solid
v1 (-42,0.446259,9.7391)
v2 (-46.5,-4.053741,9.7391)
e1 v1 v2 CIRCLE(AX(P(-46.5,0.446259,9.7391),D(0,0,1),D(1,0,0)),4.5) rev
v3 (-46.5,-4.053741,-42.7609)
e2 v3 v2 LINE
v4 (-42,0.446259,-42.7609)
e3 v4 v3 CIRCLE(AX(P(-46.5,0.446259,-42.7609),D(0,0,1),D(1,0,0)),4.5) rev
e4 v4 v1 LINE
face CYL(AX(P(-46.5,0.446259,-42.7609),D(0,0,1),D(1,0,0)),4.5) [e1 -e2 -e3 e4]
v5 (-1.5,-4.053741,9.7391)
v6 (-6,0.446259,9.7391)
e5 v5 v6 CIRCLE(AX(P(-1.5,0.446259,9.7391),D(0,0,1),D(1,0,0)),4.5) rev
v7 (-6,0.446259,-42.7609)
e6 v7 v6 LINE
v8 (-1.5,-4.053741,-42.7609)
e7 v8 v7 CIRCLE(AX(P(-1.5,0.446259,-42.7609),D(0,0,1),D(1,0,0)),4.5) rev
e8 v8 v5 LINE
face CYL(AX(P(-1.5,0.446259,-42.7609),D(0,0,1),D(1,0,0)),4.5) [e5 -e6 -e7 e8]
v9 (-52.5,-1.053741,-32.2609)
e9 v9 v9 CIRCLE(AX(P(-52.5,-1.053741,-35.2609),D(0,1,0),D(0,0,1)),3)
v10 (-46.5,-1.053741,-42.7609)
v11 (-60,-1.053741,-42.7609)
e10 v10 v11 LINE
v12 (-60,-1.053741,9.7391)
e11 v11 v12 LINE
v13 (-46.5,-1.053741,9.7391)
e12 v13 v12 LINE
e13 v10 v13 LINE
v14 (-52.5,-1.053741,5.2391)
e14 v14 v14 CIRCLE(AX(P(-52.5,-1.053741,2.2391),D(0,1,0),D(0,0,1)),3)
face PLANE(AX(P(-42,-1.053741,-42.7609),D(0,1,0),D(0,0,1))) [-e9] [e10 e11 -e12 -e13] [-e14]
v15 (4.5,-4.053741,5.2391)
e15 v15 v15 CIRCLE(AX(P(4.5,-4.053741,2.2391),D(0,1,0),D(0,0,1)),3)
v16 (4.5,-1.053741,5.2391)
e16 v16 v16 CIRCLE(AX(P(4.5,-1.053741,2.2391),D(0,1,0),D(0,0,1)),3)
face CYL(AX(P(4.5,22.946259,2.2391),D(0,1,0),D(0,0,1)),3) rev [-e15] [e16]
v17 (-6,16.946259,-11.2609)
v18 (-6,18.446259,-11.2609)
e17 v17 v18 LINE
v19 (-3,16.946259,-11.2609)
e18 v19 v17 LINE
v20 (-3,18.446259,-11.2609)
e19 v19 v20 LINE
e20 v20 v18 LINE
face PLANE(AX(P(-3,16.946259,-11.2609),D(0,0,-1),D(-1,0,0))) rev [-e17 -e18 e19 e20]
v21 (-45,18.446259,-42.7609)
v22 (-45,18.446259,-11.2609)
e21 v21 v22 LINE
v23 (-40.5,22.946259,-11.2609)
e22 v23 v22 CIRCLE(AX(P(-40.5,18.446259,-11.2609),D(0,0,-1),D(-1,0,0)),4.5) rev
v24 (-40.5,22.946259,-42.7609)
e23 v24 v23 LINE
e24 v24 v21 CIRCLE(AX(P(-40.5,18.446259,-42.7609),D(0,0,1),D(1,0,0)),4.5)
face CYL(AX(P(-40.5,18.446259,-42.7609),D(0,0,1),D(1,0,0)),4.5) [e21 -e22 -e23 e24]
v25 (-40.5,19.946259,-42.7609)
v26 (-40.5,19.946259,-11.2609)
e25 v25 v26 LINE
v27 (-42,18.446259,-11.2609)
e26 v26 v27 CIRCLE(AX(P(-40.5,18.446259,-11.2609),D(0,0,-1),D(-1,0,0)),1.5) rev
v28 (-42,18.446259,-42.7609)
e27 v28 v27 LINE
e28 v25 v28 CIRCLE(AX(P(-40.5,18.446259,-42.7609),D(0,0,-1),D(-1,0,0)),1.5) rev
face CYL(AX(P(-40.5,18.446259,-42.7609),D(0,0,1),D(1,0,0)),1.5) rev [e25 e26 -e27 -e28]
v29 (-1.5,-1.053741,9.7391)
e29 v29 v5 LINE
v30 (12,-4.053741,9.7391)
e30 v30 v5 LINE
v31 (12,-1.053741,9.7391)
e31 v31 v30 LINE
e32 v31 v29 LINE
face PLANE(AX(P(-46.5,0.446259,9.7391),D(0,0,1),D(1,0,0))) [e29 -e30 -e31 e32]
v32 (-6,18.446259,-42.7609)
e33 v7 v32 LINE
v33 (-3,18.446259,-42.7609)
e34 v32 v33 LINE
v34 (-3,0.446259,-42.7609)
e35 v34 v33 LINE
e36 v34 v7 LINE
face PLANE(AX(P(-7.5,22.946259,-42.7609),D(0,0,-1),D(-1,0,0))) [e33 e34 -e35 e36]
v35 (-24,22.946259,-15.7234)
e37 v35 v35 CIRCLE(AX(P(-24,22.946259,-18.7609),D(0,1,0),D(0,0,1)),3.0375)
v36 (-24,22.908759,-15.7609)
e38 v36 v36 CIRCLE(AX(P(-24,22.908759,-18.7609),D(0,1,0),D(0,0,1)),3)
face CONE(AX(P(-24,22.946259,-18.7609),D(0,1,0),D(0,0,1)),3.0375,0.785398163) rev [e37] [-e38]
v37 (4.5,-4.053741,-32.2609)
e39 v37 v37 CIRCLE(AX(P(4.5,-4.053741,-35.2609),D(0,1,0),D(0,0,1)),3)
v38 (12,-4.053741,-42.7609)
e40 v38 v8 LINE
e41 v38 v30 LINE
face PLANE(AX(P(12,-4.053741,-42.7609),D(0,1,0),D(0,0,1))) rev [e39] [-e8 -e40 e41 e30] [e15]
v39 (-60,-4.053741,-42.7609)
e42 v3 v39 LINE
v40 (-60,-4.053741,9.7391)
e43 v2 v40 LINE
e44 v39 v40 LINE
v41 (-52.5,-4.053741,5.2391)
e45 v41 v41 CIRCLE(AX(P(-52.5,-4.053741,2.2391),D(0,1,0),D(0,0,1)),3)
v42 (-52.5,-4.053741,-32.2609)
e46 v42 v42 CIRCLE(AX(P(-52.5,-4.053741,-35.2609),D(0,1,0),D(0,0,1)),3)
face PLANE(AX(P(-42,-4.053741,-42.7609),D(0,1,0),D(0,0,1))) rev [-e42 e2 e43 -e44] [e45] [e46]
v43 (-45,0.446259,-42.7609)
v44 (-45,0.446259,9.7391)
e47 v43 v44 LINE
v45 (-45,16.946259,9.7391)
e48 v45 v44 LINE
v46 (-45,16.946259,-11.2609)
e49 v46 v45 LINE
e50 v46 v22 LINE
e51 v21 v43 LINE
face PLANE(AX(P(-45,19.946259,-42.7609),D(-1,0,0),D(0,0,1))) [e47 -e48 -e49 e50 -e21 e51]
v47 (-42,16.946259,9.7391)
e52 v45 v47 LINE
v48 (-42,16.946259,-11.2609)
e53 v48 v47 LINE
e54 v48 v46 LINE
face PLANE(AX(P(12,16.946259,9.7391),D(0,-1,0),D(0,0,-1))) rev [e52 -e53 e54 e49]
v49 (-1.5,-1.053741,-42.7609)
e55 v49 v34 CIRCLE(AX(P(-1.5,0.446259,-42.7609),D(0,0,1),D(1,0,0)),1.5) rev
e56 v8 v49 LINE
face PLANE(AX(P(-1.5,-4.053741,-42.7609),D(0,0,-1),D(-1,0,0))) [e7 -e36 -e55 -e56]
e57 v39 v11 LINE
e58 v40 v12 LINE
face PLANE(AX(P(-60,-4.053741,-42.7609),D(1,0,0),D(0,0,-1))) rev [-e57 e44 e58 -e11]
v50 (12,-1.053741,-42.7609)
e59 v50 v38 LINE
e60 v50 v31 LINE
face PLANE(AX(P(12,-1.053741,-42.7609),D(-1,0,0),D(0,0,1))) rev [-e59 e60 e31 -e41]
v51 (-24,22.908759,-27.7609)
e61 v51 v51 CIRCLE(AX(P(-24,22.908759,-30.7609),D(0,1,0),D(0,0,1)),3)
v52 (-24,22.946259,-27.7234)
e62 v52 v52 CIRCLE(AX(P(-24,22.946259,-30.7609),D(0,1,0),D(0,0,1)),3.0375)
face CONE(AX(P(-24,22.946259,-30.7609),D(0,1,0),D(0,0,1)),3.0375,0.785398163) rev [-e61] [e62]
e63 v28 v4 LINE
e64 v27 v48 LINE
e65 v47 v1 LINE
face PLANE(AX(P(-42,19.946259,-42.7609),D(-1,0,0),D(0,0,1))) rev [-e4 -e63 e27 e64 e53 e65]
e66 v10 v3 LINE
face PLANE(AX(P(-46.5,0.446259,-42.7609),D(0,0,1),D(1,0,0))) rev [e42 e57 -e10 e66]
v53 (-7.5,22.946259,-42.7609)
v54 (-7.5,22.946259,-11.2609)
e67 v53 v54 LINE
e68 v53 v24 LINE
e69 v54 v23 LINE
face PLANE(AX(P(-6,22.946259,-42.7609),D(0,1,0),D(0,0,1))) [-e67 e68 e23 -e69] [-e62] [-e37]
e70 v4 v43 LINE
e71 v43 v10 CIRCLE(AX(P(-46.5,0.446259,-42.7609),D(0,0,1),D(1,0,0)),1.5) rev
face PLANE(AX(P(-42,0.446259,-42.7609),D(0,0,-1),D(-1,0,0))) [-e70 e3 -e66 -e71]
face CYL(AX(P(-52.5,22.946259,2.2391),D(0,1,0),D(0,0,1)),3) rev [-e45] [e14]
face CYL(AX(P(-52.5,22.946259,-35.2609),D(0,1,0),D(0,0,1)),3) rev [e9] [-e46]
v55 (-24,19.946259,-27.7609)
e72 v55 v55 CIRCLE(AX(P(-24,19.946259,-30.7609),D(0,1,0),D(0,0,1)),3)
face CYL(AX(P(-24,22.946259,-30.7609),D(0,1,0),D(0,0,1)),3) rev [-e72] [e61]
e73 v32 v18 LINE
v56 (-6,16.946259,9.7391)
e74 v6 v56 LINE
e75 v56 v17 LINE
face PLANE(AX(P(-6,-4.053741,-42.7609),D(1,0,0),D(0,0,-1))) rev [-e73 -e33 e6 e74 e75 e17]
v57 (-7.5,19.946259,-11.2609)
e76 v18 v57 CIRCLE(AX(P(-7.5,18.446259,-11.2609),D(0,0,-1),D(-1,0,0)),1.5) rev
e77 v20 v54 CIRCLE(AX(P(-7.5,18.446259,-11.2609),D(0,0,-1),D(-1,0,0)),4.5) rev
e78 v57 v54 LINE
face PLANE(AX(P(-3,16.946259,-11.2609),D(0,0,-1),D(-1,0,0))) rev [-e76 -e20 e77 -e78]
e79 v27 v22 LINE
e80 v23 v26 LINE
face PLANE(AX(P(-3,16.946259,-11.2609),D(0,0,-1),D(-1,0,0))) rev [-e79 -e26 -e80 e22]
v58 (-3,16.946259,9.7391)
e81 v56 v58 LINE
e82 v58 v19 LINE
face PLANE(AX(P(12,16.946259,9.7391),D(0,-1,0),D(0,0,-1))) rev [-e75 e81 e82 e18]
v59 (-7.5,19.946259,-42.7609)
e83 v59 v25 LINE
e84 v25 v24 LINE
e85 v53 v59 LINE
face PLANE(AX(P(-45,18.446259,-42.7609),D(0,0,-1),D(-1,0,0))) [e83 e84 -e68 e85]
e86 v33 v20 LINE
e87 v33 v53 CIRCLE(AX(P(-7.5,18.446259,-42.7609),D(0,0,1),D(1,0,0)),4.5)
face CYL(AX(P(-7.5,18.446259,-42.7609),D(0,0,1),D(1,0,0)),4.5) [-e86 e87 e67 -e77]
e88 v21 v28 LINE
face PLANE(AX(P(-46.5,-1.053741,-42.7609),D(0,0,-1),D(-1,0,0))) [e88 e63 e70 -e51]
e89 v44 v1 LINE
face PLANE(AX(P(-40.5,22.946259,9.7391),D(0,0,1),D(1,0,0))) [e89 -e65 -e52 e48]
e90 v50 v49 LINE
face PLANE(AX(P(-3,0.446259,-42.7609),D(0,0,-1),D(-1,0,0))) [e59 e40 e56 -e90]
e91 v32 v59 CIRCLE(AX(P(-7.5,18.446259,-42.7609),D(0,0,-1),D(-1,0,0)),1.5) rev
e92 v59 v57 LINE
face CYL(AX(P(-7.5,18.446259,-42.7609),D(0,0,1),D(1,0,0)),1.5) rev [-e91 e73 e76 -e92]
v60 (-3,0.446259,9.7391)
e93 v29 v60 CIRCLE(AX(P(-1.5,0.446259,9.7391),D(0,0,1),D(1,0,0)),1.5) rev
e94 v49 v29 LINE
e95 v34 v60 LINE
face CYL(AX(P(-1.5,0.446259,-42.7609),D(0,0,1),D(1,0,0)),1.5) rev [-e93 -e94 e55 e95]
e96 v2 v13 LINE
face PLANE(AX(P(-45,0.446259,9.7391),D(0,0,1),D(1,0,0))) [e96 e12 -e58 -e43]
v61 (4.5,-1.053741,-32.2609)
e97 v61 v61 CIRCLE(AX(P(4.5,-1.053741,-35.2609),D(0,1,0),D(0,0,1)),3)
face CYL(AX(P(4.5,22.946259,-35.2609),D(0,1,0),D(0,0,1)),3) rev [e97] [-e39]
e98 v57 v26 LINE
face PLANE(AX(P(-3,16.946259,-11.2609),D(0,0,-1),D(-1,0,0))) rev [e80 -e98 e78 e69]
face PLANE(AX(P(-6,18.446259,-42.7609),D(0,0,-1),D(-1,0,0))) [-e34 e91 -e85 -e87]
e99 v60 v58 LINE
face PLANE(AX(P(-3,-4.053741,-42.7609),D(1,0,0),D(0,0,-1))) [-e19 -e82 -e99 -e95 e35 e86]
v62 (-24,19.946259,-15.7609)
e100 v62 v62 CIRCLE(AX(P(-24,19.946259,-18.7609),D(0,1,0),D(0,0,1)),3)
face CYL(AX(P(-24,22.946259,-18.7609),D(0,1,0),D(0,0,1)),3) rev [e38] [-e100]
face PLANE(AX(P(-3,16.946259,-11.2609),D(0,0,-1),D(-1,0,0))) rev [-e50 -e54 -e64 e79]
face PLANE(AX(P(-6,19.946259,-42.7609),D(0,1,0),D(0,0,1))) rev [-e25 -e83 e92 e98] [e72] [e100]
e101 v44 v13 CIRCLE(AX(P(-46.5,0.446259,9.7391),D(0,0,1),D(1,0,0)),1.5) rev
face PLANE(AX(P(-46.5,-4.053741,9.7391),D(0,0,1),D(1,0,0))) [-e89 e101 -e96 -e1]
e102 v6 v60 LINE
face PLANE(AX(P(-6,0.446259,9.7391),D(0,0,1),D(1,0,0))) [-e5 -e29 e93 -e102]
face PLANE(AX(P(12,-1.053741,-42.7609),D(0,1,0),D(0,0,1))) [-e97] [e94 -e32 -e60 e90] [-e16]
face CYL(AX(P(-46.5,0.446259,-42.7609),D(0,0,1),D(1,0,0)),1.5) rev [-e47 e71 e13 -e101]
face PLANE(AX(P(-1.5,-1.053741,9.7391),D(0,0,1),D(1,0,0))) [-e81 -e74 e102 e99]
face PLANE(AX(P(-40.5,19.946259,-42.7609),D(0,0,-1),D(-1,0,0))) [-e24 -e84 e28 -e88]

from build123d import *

# Parameters (mm, degrees)
BASE_FLANGE1_DEPTH                 = 35
SKETCH10_W                         = 28
SKETCH10_H                         = 14
CUT_EXTRUDE1_DEPTH                 = 4
F_4_0_4_DIAMETER_HOLE1_D           = 4
F_4_0_4_DIAMETER_HOLE1_CSINK_D     = 4.05
F_4_0_4_DIAMETER_HOLE1_CSINK_ANGLE = 90
SCALE1_SCALE                       = 1.5


# Sheet-metal steps are written as plain solids
with BuildPart() as part:
    # Sketch1 → Base-Flange1 (new body)
    with BuildSketch(Plane.XY):
        with BuildLine():
            Line((0, 0), (-9, 0))
            ThreePointArc((-9, 0), (-11.121320344, 0.878679656), (-12, 3))
            Line((-12, 3), (-12, 15))
            ThreePointArc((-12, 15), (-12.292893219, 15.707106781), (-13, 16))
            Line((-13, 16), (-35, 16))
            ThreePointArc((-35, 16), (-35.707106781, 15.707106781), (-36, 15))
            Line((-36, 15), (-36, 3))
            ThreePointArc((-36, 3), (-36.878679656, 0.878679656), (-39, 0))
            Line((-39, 0), (-48, 0))
            Line((-48, 0), (-48, 2))
            Line((-48, 2), (-39, 2))
            ThreePointArc((-39, 2), (-38.292893219, 2.292893219), (-38, 3))
            Line((-38, 3), (-38, 15))
            ThreePointArc((-38, 15), (-37.121320344, 17.121320344), (-35, 18))
            Line((-35, 18), (-13, 18))
            ThreePointArc((-13, 18), (-10.878679656, 17.121320344), (-10, 15))
            Line((-10, 15), (-10, 3))
            ThreePointArc((-10, 3), (-9.707106781, 2.292893219), (-9, 2))
            Line((-9, 2), (0, 2))
            Line((0, 2), (0, 0))
        make_face()
    extrude(amount=-BASE_FLANGE1_DEPTH)

    # Sketch10 → Cut-Extrude1 (cut)
    with BuildSketch(Plane(origin=(0, 18, 0), x_dir=(1, 0, 0), z_dir=(0, 1, 0))):
        with Locations((-24, 7)):
            Rectangle(SKETCH10_W, SKETCH10_H)
    extrude(amount=-CUT_EXTRUDE1_DEPTH, mode=Mode.SUBTRACT)

    # Ø4.0 (4) Diameter Hole1 (through all)
    with Locations(Plane(origin=(0, 18, 0), x_dir=(1, 0, 0), z_dir=(0, 1, 0))):
        with Locations((-24, 27), (-24, 19), (-43, 30), (-43, 5), (-5, 30), (-5, 5)):
            CounterSinkHole(F_4_0_4_DIAMETER_HOLE1_D / 2, F_4_0_4_DIAMETER_HOLE1_CSINK_D / 2, counter_sink_angle=F_4_0_4_DIAMETER_HOLE1_CSINK_ANGLE)


with BuildPart() as part_1:
    # Scale1: scaled about (-24, 8.107482912, -19.478199083)
    add(part.part.scale(SCALE1_SCALE).moved(Location((12, -4.053741456, 9.739099541))))


solid = part_1.part
